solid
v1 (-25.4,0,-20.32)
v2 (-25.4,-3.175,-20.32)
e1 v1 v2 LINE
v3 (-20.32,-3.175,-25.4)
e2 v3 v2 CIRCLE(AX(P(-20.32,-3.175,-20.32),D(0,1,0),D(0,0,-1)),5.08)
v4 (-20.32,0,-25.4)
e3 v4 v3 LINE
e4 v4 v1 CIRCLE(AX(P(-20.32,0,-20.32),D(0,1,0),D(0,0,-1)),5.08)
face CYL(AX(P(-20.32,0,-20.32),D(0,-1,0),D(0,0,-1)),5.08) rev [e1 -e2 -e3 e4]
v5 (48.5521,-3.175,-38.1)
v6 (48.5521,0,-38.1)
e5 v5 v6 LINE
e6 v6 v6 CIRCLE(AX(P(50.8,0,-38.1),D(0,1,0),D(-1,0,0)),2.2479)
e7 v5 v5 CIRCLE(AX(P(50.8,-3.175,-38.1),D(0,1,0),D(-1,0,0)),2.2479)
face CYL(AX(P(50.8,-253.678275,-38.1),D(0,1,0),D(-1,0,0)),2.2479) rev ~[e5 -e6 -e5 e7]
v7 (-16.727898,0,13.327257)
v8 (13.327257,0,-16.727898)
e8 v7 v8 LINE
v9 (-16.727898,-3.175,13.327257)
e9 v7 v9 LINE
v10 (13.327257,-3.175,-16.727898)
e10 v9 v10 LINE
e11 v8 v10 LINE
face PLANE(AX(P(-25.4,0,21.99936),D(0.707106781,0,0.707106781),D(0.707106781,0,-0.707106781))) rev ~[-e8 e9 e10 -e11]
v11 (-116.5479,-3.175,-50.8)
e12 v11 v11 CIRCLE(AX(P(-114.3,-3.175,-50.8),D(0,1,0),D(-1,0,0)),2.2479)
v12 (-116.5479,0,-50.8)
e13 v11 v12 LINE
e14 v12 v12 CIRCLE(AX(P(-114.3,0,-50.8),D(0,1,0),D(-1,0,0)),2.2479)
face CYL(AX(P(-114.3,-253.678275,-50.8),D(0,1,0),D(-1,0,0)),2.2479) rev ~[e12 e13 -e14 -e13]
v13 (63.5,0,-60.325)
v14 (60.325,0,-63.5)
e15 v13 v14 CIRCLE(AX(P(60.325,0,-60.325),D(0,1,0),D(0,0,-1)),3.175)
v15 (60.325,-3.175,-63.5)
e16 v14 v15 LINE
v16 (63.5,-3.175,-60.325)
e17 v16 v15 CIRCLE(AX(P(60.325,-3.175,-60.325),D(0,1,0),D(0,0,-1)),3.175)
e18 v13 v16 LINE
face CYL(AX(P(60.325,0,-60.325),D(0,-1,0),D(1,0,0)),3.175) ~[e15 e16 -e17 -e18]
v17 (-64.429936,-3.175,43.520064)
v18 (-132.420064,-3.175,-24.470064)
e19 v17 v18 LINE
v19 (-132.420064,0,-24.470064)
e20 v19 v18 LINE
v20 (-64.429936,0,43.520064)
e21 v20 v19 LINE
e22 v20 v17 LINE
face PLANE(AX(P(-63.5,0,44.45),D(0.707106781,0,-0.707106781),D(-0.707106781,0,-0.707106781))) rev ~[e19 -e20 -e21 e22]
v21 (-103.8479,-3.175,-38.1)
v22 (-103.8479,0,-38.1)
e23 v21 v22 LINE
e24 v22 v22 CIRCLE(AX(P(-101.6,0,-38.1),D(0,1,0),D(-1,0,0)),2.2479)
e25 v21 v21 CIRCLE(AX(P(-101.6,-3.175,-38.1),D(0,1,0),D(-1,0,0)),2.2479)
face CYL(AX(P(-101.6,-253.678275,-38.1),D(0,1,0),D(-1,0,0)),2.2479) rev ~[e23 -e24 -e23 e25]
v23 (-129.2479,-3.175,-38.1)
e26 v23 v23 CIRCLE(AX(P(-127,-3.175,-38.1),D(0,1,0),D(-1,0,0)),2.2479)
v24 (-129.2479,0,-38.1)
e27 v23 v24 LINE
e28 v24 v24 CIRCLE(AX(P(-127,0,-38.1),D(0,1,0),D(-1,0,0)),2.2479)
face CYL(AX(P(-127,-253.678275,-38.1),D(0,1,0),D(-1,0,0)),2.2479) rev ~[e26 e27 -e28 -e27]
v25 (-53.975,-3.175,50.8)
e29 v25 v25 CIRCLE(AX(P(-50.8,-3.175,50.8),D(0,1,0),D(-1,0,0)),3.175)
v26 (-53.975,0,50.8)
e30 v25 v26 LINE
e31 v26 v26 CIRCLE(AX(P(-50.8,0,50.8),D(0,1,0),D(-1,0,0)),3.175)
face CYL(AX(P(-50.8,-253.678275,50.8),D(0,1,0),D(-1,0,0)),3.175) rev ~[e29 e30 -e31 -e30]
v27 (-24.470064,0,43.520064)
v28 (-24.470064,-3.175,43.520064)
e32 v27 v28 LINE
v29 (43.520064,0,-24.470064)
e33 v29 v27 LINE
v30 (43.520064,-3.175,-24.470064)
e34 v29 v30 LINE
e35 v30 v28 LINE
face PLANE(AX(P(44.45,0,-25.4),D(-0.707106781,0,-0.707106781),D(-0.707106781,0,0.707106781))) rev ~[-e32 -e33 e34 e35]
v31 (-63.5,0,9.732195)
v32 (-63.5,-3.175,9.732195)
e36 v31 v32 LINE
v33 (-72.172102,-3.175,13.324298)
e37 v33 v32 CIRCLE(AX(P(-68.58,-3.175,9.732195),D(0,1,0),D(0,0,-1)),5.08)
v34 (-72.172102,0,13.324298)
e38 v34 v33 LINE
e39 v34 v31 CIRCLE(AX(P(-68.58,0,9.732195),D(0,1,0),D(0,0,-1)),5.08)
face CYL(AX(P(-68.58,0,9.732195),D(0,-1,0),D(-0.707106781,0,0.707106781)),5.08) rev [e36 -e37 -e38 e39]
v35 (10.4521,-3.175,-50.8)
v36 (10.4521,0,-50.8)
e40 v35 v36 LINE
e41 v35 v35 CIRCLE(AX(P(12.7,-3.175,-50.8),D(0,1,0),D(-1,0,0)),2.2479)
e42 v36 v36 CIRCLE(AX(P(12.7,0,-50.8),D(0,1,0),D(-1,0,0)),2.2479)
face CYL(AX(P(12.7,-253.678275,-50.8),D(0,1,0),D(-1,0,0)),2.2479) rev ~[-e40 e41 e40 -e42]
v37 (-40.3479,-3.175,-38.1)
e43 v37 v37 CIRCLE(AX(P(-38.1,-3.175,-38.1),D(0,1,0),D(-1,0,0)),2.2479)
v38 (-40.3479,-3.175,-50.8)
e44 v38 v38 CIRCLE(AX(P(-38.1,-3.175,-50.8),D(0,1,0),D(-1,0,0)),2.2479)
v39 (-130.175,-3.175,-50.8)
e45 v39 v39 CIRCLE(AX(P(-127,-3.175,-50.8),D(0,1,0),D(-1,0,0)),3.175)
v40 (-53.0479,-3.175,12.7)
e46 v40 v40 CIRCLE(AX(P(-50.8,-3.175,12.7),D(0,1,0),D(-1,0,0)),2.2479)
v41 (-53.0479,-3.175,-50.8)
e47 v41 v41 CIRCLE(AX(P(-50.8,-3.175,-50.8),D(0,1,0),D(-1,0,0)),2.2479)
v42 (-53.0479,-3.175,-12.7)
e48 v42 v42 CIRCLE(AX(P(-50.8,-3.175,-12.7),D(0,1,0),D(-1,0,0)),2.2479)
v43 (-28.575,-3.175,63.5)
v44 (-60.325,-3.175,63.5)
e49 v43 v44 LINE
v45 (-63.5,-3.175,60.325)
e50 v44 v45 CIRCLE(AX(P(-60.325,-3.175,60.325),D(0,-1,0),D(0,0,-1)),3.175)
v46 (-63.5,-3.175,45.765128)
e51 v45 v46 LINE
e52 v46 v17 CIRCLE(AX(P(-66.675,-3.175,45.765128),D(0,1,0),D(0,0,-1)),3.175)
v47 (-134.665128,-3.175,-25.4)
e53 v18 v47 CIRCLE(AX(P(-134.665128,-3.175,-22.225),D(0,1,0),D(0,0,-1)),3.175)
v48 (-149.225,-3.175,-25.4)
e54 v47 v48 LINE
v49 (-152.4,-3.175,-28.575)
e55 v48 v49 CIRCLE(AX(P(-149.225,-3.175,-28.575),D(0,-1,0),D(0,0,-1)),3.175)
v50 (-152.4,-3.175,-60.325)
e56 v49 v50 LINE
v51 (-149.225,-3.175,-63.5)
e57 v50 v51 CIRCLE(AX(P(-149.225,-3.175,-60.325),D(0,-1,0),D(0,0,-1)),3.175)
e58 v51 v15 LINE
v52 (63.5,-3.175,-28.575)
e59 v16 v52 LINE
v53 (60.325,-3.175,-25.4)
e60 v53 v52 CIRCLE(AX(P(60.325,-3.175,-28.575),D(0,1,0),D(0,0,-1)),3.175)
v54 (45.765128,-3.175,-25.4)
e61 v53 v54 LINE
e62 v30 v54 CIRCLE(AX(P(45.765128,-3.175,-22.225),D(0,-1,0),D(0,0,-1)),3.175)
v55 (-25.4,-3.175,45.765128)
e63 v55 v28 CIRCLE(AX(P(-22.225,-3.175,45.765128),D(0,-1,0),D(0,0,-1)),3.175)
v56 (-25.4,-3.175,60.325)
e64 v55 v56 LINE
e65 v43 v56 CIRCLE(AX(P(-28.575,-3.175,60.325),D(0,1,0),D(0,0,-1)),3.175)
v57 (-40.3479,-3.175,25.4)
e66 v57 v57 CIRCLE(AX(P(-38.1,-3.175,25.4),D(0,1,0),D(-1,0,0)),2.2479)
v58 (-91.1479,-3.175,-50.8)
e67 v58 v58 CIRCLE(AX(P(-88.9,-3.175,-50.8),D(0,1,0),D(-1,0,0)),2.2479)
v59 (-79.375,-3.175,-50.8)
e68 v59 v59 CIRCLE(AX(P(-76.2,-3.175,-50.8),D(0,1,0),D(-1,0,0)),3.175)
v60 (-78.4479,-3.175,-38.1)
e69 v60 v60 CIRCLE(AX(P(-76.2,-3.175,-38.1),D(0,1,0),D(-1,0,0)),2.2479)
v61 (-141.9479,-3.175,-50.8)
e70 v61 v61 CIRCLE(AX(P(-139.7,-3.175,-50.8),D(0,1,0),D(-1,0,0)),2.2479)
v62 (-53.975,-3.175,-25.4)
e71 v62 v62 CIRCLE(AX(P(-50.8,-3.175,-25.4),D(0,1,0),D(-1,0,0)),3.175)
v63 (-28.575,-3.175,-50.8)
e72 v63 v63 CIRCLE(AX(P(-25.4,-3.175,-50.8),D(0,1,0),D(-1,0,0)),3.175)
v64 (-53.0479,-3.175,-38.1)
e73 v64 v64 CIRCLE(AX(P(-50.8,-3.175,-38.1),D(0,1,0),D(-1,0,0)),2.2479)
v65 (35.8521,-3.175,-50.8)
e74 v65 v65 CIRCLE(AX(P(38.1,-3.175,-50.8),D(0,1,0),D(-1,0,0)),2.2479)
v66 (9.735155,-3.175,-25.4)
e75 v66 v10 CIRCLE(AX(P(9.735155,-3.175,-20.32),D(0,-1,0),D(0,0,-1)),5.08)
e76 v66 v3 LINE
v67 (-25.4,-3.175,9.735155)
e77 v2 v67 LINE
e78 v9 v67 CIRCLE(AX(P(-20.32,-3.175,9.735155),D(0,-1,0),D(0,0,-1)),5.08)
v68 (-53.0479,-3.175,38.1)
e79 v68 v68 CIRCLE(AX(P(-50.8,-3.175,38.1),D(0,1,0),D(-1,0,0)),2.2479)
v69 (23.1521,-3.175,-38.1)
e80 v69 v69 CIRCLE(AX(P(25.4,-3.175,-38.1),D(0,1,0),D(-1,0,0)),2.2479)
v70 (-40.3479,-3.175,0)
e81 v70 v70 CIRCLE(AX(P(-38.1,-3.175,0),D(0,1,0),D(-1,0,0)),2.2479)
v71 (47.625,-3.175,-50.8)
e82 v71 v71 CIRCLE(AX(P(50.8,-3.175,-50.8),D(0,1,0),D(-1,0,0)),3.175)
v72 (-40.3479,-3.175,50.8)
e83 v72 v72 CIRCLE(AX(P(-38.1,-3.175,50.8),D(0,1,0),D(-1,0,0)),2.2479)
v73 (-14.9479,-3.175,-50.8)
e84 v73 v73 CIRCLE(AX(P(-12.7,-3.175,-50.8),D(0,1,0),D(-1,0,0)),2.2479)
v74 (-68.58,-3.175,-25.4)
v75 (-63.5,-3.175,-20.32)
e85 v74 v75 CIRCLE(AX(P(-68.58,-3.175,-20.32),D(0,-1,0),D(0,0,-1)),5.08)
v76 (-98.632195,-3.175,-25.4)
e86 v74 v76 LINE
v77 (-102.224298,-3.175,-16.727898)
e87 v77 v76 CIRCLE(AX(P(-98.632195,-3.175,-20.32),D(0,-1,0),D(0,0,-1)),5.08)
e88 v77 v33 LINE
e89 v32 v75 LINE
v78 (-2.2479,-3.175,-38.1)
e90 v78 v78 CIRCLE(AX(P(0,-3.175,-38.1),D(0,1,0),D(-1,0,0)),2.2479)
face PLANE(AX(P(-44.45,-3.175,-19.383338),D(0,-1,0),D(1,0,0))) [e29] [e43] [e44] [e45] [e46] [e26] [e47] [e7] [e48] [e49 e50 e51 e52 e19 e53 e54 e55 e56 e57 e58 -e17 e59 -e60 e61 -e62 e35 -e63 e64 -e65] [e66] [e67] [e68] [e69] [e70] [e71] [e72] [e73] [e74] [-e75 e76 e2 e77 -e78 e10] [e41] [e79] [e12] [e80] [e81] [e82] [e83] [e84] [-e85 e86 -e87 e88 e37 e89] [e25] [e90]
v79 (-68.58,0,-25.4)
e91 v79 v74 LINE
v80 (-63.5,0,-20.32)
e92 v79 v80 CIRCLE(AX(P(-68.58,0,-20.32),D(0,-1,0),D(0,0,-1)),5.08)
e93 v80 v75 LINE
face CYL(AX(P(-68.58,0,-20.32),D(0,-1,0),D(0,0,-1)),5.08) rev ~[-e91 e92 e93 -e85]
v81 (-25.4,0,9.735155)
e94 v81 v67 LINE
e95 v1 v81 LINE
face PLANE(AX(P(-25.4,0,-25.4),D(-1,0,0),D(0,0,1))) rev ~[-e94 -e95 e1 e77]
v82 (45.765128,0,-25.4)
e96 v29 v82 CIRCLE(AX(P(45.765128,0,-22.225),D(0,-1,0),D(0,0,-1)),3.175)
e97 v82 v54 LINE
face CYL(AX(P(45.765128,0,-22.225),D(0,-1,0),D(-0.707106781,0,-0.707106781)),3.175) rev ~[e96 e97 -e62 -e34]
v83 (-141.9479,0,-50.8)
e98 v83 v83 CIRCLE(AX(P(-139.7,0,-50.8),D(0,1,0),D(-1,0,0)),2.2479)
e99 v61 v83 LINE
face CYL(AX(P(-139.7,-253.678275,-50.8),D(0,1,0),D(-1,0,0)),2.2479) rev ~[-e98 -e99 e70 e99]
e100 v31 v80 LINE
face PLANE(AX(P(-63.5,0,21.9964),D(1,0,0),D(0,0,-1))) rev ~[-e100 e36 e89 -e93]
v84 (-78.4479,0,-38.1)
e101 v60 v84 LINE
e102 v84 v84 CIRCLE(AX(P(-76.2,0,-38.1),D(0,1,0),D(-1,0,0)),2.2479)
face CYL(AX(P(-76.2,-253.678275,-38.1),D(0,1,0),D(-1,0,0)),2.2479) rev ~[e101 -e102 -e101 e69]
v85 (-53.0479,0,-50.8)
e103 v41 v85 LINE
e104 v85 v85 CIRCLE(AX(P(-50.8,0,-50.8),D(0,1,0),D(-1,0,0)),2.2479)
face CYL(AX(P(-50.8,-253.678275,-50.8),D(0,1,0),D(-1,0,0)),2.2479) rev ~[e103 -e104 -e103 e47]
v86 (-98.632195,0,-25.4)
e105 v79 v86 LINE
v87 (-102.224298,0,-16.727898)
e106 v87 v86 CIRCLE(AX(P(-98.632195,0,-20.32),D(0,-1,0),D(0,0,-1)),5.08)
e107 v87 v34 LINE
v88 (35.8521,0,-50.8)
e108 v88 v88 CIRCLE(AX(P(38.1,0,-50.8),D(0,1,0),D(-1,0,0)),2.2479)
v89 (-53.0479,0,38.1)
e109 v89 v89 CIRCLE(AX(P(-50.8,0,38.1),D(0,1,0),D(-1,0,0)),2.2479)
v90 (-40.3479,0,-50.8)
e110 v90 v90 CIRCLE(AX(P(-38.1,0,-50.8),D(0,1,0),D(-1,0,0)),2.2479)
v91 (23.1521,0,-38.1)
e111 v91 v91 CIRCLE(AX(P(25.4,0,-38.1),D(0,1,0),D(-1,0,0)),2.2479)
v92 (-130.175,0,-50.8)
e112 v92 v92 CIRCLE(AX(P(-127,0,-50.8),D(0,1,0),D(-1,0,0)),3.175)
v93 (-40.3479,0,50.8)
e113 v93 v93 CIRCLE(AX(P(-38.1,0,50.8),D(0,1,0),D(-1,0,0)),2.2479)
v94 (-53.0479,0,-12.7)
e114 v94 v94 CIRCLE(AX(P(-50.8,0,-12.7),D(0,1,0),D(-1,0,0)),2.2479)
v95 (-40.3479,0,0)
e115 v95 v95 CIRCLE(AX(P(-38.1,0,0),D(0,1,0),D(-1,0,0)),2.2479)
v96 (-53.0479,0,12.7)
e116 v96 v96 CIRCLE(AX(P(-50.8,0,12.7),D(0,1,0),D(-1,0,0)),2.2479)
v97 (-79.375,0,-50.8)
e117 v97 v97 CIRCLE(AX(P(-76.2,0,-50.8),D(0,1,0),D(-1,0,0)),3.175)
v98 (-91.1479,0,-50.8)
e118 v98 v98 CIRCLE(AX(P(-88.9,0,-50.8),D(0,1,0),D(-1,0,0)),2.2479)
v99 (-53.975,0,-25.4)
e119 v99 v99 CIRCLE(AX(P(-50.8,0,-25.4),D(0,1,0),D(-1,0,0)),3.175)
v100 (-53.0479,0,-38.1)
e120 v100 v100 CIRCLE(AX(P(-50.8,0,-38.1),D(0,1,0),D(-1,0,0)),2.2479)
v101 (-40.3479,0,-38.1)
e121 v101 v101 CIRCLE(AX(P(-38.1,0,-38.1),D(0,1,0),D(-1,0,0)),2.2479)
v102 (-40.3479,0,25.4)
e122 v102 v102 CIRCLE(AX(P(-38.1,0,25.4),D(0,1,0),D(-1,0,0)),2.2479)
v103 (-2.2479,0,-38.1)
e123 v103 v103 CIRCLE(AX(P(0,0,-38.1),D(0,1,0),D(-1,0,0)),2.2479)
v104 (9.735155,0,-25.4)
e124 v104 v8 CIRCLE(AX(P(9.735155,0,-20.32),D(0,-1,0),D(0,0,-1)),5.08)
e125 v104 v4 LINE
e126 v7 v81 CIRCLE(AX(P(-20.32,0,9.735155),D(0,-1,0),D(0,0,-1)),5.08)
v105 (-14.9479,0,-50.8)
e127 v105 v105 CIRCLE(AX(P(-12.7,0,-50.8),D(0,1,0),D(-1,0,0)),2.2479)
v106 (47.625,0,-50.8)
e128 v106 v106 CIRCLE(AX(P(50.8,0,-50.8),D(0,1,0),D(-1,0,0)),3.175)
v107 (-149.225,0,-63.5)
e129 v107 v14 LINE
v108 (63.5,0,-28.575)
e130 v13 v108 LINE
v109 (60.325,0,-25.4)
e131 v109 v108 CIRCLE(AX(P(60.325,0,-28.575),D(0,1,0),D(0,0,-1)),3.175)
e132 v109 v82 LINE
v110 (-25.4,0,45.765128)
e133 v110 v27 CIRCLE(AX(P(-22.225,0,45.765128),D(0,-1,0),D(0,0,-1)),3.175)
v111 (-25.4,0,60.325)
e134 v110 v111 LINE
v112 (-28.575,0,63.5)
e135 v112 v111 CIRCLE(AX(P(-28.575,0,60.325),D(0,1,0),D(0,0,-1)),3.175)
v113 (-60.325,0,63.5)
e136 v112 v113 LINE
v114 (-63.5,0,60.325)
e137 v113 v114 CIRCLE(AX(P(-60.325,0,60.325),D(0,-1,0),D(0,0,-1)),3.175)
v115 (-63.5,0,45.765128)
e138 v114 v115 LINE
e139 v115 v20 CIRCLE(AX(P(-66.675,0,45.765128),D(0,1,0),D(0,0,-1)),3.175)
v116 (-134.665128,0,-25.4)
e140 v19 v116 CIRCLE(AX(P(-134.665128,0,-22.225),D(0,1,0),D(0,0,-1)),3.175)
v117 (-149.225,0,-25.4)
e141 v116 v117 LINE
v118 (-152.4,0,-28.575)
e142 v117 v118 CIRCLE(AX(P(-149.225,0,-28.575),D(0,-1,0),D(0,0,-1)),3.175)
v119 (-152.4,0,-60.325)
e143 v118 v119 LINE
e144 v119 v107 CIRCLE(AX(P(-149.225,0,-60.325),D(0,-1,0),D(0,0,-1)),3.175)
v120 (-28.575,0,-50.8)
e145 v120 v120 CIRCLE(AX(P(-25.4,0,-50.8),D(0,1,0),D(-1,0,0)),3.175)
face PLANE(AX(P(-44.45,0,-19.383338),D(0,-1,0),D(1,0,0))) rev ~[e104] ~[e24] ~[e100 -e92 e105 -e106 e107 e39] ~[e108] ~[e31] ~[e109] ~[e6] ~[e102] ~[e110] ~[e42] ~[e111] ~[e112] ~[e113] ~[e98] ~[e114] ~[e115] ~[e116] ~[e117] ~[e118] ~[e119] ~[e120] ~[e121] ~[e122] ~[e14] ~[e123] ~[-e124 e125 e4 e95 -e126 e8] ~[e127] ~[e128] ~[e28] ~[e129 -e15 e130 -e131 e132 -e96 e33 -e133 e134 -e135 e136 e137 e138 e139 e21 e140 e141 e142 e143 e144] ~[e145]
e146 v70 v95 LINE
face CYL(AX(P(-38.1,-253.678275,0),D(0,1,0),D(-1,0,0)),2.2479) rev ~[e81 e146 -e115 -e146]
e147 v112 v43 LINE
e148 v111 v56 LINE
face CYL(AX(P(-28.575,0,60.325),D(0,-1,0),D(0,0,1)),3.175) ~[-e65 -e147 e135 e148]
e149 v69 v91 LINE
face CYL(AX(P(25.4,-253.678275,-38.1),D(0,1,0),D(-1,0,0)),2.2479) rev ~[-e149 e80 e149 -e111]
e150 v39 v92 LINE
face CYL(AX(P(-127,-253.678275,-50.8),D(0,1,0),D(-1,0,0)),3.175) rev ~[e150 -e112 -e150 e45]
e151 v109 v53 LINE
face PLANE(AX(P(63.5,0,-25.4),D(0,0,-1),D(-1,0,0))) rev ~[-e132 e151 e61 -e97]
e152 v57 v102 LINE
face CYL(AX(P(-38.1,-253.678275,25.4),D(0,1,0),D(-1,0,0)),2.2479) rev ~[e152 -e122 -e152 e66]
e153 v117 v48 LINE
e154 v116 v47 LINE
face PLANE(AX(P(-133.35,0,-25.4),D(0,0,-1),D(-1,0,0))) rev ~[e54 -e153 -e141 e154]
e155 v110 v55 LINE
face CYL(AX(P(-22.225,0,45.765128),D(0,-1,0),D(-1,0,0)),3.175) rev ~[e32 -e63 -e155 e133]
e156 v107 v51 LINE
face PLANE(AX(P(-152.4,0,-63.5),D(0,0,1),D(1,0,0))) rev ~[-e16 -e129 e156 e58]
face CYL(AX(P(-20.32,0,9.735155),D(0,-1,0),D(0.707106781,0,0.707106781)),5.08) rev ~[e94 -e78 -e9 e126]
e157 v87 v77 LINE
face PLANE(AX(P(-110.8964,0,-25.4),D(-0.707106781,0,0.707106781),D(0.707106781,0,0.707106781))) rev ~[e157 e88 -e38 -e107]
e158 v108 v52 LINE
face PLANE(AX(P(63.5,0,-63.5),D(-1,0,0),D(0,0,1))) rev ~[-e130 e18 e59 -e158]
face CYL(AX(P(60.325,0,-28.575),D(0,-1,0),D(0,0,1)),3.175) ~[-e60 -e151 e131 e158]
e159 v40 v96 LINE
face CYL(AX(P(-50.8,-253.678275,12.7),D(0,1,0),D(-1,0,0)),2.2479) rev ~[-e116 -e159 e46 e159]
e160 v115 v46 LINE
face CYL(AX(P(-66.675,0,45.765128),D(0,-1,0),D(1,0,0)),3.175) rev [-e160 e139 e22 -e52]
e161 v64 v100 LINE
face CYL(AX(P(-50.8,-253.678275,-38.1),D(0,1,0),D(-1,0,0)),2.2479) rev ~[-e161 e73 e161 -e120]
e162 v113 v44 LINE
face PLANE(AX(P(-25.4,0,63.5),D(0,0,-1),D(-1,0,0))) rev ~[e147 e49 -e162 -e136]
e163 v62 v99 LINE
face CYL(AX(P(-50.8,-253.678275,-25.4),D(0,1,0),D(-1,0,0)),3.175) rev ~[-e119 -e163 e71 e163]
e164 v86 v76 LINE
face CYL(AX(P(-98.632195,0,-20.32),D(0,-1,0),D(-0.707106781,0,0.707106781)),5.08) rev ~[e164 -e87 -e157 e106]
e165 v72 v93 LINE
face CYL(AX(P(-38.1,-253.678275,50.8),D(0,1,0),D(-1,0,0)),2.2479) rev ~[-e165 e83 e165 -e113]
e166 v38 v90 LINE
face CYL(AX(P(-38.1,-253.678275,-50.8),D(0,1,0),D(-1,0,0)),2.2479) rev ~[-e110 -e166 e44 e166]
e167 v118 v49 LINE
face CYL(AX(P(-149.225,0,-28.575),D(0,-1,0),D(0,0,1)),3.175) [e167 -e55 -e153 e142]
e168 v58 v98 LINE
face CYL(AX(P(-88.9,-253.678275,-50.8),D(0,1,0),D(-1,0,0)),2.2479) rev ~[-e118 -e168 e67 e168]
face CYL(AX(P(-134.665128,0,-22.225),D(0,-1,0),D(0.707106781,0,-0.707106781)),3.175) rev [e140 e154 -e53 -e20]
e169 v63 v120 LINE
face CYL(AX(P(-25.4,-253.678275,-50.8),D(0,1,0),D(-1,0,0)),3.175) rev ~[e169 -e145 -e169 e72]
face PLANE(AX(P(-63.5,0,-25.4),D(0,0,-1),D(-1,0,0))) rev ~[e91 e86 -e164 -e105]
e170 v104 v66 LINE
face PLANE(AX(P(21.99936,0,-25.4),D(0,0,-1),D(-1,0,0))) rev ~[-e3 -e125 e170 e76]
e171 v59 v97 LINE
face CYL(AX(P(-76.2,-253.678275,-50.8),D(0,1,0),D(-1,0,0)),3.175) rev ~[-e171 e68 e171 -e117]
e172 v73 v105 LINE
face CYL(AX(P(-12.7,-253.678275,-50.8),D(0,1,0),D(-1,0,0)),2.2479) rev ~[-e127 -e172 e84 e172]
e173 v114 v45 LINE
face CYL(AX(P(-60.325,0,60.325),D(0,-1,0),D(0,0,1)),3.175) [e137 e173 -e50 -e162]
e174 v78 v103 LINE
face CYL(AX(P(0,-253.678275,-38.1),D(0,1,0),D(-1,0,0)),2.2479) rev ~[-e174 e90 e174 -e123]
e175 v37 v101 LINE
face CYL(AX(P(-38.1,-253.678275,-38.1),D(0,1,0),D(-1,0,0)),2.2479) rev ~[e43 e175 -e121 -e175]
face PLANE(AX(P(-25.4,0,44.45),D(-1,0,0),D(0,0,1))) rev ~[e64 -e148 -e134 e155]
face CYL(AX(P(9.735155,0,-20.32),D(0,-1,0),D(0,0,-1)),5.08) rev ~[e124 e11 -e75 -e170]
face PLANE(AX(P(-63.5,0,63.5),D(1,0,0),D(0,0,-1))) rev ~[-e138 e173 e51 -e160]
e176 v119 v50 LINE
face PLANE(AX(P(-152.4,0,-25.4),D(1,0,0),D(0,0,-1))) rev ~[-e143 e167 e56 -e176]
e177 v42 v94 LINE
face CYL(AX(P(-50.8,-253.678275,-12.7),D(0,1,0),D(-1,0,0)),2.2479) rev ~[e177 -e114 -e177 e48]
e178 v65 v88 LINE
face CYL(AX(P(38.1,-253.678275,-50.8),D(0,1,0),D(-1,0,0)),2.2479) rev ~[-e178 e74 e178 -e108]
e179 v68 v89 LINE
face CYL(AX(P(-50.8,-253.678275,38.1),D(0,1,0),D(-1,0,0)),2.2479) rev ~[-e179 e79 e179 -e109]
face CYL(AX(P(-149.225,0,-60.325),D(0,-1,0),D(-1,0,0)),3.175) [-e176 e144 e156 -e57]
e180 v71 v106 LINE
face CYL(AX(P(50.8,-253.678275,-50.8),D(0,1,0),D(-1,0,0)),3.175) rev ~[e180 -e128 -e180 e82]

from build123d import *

# Parameters (mm, degrees)
F1_DEPTH = 3.175
F2_R     = 3.175
F3_R     = 5.08
F5_D     = 6.35
F6_D     = 4.4958
F7_R     = 5.08


with BuildPart() as f1:
    # F0 (on Front) → F1 (new body)
    with BuildSketch(Plane.XZ):
        Polygon((-25.4, 63.5), (-63.5, 63.5), (-63.5, 44.45), (-133.35, -25.4), (-152.4, -25.4), (-152.4, -63.5), (-63.5, -63.5), (63.5, -63.5), (63.5, -25.4), (44.45, -25.4), (-25.4, 44.45), align=None)
        Polygon((-63.5, 21.9964), (-63.5, -25.4), (-110.8964, -25.4), align=None, mode=Mode.SUBTRACT)
        Polygon((-25.4, -25.4), (-25.4, 21.9993596973), (21.9993596973, -25.4), align=None, mode=Mode.SUBTRACT)
    extrude(amount=F1_DEPTH)

    # F2
    f2_edges = [f1.edges().sort_by_distance(p)[0] for p in [
        (-25.4, -1.5875, 63.5),
        (-25.4, -1.5875, 44.45),
        (44.45, -1.5875, -25.4),
        (63.5, -1.5875, -25.4),
        (63.5, -1.5875, -63.5),
        (-63.5, -1.5875, 63.5),
        (-133.35, -1.5875, -25.4),
        (-152.4, -1.5875, -25.4),
        (-152.4, -1.5875, -63.5),
        (-63.5, -1.5875, 44.45),
    ]]
    fillet(f2_edges, radius=F2_R)

    # F3
    f3_edges = [f1.edges().sort_by_distance(p)[0] for p in [
        (21.99936, -1.5875, -25.4),
        (-25.4, -1.5875, -25.4),
        (-25.4, -1.5875, 21.99936),
    ]]
    fillet(f3_edges, radius=F3_R)

    # F5 (through all)
    with Locations(Plane.XZ.offset(3.175)):
        with Locations((-50.8, 50.8), (-50.8, -25.4), (50.8, -50.8), (-25.4, -50.8), (-76.2, -50.8), (-127, -50.8)):
            Hole(F5_D / 2)

    # F6 (through all)
    with Locations(Plane.XZ.offset(3.175)):
        with Locations((-50.8, 38.1), (-38.1, 50.8), (-38.1, 25.4), (-50.8, 12.7), (-38.1, 0), (-50.8, -12.7), (-38.1, -38.1), (-50.8, -38.1), (-50.8, -50.8), (-38.1, -50.8), (-12.7, -50.8), (0, -38.1), (12.7, -50.8), (25.4, -38.1), (38.1, -50.8), (50.8, -38.1), (-139.7, -50.8), (-127, -38.1), (-114.3, -50.8), (-101.6, -38.1), (-88.9, -50.8), (-76.2, -38.1)):
            Hole(F6_D / 2)

    # F7
    f7_edges = [f1.edges().sort_by_distance(p)[0] for p in [
        (-110.8964, -1.5875, -25.4),
        (-63.5, -1.5875, -25.4),
        (-63.5, -1.5875, 21.9964),
    ]]
    fillet(f7_edges, radius=F7_R)


solid = f1.part
